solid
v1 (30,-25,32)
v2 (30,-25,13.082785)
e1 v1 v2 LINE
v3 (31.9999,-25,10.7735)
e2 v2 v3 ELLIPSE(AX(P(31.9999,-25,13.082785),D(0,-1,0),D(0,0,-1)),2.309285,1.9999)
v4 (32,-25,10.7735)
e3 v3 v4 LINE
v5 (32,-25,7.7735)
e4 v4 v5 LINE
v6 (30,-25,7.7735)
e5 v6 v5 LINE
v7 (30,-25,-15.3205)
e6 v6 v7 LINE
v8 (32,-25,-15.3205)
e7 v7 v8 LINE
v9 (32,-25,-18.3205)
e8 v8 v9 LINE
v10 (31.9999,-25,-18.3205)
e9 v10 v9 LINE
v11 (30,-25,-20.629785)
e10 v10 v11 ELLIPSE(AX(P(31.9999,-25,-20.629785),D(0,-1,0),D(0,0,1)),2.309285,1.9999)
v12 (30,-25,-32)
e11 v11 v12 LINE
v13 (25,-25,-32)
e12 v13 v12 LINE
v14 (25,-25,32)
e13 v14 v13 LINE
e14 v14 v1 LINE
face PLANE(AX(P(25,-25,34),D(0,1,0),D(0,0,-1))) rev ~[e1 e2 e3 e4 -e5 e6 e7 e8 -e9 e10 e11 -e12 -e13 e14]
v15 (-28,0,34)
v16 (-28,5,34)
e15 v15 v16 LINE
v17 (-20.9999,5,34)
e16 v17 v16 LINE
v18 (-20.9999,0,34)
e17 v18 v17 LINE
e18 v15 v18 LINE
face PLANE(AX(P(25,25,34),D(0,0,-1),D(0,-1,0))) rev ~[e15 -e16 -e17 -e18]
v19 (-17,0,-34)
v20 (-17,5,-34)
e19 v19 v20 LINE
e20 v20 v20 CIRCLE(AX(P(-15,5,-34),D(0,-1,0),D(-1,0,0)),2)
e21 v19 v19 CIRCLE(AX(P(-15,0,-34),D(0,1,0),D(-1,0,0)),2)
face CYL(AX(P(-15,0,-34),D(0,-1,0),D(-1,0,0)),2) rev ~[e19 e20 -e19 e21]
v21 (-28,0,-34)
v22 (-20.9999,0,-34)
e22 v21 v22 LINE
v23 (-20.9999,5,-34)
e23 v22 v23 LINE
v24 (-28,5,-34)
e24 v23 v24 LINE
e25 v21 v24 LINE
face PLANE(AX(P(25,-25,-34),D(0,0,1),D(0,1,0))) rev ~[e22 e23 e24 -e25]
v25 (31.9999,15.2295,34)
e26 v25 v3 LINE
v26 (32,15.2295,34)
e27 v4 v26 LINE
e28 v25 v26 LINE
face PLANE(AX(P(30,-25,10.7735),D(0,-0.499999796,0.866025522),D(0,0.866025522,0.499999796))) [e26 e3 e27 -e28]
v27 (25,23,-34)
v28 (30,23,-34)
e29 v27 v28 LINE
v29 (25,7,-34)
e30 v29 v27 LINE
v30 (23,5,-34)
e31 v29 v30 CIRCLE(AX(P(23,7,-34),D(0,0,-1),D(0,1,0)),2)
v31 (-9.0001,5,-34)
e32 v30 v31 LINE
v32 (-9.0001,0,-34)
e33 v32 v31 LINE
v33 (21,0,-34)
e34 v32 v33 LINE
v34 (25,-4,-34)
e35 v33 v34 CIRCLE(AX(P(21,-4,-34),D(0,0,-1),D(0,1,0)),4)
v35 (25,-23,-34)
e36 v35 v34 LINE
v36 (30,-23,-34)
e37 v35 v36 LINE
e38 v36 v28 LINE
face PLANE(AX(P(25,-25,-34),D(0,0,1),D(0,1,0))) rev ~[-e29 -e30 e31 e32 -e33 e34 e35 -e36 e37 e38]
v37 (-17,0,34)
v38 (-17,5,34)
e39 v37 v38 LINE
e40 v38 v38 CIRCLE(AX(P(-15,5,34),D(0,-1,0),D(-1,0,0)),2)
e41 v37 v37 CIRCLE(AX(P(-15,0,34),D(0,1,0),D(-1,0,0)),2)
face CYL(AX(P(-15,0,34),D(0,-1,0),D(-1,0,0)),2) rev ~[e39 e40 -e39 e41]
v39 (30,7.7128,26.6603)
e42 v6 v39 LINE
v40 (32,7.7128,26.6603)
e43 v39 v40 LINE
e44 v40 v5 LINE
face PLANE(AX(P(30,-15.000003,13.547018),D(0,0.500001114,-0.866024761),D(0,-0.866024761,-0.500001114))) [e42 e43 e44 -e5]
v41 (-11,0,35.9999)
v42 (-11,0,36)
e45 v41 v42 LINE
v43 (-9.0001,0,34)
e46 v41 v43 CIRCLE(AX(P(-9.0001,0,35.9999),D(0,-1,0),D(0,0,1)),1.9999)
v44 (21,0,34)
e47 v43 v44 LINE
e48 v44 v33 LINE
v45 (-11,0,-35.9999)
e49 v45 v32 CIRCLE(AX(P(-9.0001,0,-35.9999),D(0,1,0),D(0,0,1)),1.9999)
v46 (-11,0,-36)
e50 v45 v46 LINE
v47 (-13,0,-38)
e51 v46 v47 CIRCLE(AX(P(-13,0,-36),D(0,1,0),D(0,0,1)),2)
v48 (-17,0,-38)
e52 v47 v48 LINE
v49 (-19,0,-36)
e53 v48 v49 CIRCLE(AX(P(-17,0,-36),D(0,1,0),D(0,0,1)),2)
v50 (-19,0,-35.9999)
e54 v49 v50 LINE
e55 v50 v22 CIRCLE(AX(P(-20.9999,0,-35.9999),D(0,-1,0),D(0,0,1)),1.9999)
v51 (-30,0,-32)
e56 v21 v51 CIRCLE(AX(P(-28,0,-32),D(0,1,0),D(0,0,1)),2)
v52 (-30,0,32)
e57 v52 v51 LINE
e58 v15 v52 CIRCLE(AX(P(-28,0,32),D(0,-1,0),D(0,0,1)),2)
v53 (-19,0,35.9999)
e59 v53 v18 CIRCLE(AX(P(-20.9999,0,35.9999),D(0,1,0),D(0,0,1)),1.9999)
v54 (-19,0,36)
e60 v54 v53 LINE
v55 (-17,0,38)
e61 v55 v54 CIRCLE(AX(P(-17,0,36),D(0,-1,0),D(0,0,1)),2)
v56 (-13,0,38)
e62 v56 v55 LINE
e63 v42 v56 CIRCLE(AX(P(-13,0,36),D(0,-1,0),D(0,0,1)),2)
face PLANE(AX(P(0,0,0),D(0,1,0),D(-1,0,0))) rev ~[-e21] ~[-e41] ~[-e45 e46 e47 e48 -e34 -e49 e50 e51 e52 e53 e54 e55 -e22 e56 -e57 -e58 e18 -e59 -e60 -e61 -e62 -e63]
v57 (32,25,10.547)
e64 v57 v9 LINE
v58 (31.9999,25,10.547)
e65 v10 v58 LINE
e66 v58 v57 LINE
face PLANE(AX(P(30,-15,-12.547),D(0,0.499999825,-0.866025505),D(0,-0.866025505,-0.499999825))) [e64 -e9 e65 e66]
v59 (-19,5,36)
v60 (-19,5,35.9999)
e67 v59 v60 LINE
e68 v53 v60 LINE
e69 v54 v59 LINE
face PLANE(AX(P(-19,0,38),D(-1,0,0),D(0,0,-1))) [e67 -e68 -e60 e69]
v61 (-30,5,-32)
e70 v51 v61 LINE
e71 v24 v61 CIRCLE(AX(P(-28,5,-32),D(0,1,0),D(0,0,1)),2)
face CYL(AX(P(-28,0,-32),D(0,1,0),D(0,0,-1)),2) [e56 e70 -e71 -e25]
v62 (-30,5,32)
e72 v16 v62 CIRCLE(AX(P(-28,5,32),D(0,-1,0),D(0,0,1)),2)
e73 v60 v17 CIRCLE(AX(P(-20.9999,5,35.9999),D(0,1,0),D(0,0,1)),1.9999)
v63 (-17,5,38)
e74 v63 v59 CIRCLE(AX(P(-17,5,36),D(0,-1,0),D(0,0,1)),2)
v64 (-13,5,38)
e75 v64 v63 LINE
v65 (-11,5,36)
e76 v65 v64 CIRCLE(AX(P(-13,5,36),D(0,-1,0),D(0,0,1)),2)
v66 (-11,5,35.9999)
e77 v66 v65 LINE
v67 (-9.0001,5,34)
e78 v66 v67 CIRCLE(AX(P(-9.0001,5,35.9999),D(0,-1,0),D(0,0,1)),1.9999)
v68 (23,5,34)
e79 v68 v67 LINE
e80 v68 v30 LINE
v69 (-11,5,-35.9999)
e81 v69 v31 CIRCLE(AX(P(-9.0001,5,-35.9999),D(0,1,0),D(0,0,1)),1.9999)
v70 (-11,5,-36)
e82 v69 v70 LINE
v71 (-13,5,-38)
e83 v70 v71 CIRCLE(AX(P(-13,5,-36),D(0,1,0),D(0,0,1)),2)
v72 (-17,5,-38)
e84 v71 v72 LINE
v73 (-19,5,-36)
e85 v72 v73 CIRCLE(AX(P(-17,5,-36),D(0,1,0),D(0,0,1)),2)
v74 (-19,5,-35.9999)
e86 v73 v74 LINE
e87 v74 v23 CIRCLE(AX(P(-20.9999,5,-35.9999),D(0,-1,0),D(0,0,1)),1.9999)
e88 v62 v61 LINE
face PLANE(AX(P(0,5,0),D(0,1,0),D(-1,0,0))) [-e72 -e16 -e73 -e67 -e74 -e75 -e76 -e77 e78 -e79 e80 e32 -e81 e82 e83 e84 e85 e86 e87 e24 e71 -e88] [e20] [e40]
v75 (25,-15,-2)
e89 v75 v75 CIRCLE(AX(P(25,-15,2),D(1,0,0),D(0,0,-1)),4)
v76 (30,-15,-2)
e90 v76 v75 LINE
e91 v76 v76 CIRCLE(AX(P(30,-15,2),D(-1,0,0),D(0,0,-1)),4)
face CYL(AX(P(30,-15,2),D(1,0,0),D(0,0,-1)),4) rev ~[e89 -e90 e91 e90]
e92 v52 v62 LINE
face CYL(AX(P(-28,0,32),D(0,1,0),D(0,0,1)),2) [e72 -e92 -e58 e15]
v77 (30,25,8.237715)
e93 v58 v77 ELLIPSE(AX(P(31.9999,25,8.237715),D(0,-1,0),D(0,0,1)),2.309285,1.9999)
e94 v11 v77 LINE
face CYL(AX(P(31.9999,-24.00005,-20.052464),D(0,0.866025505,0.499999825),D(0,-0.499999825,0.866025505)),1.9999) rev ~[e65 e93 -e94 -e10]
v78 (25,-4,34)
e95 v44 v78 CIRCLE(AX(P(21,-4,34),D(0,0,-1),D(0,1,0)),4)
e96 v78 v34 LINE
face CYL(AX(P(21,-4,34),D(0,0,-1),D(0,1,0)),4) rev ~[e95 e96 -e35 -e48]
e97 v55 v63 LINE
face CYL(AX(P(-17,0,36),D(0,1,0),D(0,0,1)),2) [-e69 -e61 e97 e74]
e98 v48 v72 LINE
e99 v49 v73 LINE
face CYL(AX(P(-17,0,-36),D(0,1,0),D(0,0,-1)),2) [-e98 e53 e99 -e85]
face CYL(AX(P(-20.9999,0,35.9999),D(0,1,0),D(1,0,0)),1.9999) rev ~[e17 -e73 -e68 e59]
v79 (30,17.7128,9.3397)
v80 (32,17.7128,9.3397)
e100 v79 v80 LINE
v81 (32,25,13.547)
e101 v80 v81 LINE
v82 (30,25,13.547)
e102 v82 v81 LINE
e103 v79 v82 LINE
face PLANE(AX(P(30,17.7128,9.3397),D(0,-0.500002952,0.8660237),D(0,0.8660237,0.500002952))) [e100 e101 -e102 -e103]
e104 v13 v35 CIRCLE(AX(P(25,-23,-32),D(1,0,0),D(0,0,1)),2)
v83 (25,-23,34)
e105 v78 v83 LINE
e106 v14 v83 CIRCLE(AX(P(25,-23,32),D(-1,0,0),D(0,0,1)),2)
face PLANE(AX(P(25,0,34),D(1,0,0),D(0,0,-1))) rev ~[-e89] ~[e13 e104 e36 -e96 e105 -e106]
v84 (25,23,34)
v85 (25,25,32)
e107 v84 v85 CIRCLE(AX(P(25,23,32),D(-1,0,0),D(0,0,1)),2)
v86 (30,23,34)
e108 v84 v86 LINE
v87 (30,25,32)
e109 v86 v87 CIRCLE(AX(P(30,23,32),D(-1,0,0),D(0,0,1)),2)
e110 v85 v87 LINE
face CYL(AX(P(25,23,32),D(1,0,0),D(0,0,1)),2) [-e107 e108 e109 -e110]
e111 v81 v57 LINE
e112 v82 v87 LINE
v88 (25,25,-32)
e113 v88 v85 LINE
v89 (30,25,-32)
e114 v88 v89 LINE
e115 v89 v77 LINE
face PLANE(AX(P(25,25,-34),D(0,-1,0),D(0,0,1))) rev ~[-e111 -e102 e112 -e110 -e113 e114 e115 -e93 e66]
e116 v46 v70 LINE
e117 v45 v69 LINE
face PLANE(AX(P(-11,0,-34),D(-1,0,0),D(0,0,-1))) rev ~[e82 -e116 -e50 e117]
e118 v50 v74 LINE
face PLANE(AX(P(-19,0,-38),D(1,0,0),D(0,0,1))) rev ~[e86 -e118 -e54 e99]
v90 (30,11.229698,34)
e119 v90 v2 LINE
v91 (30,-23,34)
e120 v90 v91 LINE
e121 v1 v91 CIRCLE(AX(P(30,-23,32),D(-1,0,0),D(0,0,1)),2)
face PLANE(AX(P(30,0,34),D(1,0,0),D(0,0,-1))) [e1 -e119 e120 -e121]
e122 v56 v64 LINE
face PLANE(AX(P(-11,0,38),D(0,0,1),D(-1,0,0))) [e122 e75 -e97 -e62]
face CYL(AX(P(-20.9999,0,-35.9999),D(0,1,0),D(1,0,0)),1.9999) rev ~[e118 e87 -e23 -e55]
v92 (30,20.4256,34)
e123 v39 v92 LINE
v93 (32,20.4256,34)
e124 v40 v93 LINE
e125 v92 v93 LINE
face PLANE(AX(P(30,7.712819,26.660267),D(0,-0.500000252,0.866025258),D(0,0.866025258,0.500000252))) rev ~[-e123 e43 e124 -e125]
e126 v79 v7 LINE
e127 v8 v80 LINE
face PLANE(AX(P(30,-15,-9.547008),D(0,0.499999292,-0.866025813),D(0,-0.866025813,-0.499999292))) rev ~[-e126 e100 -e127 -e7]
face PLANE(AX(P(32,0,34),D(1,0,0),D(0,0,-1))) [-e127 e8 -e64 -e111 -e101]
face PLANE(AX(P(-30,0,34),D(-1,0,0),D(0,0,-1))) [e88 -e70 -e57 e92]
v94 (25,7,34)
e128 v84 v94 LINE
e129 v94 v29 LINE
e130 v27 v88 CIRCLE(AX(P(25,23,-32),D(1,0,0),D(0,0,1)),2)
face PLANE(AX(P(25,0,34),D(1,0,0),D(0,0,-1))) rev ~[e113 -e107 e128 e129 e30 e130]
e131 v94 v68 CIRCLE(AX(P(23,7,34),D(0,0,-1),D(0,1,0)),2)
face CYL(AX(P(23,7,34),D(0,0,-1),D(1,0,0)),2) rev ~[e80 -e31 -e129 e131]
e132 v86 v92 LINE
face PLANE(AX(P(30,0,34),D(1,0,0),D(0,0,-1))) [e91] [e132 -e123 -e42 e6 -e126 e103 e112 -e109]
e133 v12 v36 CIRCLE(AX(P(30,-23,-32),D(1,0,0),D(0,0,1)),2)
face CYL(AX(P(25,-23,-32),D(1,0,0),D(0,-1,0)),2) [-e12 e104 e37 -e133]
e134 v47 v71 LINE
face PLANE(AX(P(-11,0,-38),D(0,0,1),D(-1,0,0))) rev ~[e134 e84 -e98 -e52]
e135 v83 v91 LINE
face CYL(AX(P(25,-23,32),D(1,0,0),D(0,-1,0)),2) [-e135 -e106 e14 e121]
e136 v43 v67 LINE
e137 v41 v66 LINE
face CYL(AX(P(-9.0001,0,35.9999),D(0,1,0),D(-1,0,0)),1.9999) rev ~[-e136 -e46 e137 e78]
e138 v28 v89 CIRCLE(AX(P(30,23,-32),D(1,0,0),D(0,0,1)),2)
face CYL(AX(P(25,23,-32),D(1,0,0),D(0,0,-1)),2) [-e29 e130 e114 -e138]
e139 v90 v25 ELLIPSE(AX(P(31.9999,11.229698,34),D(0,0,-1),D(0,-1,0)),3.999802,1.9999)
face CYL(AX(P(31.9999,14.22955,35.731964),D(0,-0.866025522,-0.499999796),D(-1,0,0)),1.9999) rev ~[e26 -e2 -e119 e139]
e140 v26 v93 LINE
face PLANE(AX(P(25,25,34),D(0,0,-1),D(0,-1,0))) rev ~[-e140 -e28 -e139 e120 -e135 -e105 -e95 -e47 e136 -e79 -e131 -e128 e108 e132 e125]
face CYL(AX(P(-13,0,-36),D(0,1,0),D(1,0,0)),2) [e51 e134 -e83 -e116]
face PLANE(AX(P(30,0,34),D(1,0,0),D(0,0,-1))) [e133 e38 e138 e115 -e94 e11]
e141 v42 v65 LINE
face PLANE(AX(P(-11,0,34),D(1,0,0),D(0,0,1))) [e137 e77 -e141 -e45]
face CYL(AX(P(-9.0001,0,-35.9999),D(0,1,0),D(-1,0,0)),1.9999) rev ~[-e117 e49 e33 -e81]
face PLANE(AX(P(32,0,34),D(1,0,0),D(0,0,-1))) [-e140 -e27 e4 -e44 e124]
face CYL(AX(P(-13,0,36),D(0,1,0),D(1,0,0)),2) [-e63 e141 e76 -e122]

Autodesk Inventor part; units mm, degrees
ref_plane "YZ Plane" through (0, 0, 0) normal (1, 0, 0) x (0, 1, 0)
ref_plane "XZ Plane" through (0, 0, 0) normal (0, 1, 0) x (-1, 0, 0)
ref_plane "XY Plane" through (0, 0, 0) normal (0, 0, 1) x (1, 0, 0)
sketch "Sketch1" plane through (0, 0, 0) normal (0, 1, 0) x (-1, 0, 0)
  point P0 (0, 0)
sketch "Sketch2" plane through (0, 0, 0) normal (0, 1, 0) x (-1, 0, 0)
  line L0 (-10, 34) -> (10, 34)
  line L1 (10, 34) -> (10, -34)
  line L2 (10, -34) -> (-10, -34)
  line L3 (-10, -34) -> (-10, 34)
  line L4 (-10, 34) -> (10, -34) construction
  line L5 (10, 34) -> (-10, -34) construction
  line L6 (-10, 34) -> (-25, 34)
  line L7 (-25, 34) -> (-25, -34)
  line L8 (-25, -34) -> (-10, -34)
  line L9 (-10, -34) -> (-10, 34)
  line L10 (-10, 34) -> (30, 34)
  line L11 (30, 34) -> (30, -34)
  line L12 (30, -34) -> (-10, -34)
  line L13 (-10, -34) -> (-10, 34)
  line L14 (-10, -34) -> (-14, -34)
  line L15 (-14, -34) -> (-6, -34)
  line L16 (-6, -34) -> (-14, -34)
  line L17 (-10, 34) -> (-14, 34)
  line L18 (-14, 34) -> (-6, 34)
  line L19 (-14, 34) -> (-6, 34)
  line L20 (30, 34) -> (15, 34)
  line L21 (15, 34) -> (15, -34)
  line L22 (15, -34) -> (30, -34)
  line L23 (30, -34) -> (30, 34)
  circle A0 centre (15, -34) radius 2
  circle A1 centre (15, 34) radius 2
  line L24 (15, 34) -> (19, 34)
  line L25 (19, 34) -> (11, 34)
  line L26 (11, 34) -> (11, 38)
  line L27 (11, 38) -> (19, 38)
  line L28 (19, 38) -> (19, 34)
  line L29 (15, -34) -> (19, -34)
  line L30 (19, -34) -> (11, -34)
  line L31 (11, -34) -> (11, -38)
  line L32 (11, -38) -> (19, -38)
  line L33 (19, -38) -> (19, -34)
  point P0 (0, 0)
  point P1 (10, 34)
  point P2 (13, 34)
  point P3 (17, 34)
  point P4 (17, -34)
  point P5 (13, -34)
  point P6 (10, 34)
  dimension "d0" = 20
  dimension "d1" = 68
  dimension "d4" = 15
  dimension "d5" = 40
  dimension "d10" = 4
  dimension "d11" = 8
  dimension "d42" = 15
  dimension "d43" = 4
  dimension "d44" = 4
  dimension "d45" = 4
  dimension "d46" = 8
  dimension "d47" = 4
  dimension "d48" = 8
  dimension "d49" = 4
sketch "Sketch3" plane through (0, 0, 0) normal (0, 1, 0) x (-1, 0, 0)
  point P0 (0, 0)
extrude "Extrusion1" add sketch "Sketch2" along normal blind 5 contours L0 L1 L2 L3 | L3 L8 L7 L6 | L10 A1 L21 A0 L12 L1 | L10 L21 A1 | A0 L21 L12 | L10 A1 L21 | L10 L11 L12 A0 L21 A1 | L21 A0 L12
sketch "Sketch4" plane through (0, 0, 0) normal (0, -1, 0) x (1, 0, 0)
  point P0 (0, 0)
sketch "Sketch5" plane through (-30, 0, -34) normal (-1, 0, 0) x (0, 0, 1)
  point P0 (34, 0)
sketch "Sketch6" plane through (25, 0, 34) normal (1, 0, 0) x (0, 0, -1)
  line L0 (0, -25) -> (68, -25)
  line L1 (68, -25) -> (68, 25)
  line L2 (68, 25) -> (0, 25)
  line L3 (0, 25) -> (0, -25)
  line L4 (0, -25) -> (68, 25) construction
  line L5 (68, -25) -> (0, 25) construction
  point P0 (34, 0)
  dimension "d16" = 50
  dimension "d41" = 68
extrude "Extrusion2" add sketch "Sketch6" along normal blind 5
fillet "Face Fillet1" radius 2 1 edges at (25, 5, 0)
sketch "Sketch7" plane through (30, 0, 34) normal (1, 0, 0) x (0, 0, -1)
  line L0 (68, -25) -> (68, 0) projected
  line L1 (0, 25) -> (68, 25)
  line L2 (68, 25) -> (68, -15)
  line L3 (68, -15) -> (0, -15)
  line L4 (0, -15) -> (0, 25)
  line L5 (0, -15) -> (32, -15)
  circle A0 centre (32, -15) radius 4
  point P0 (34, 0)
  dimension "d20" = 40
  dimension "d21" = 32
  dimension "d22" = 8
extrude "Extrusion3" cut sketch "Sketch7" against normal through all contours A0 L3 | L3 A0
sketch "Sketch8" plane through (30, 0, 34) normal (1, 0, 0) x (0, 0, -1)
  line L0 (68, -25) -> (68, 0) projected
  line L1 (0, 25) -> (68, 25)
  line L2 (68, 25) -> (68, -15)
  line L3 (68, -15) -> (0, -15)
  line L4 (0, -15) -> (0, 25)
  line L5 (0, -15) -> (34, -15)
  circle A0 centre (32, -15) radius 4 projected
  line L6 (32, -15) -> (8.906, 25)
  line L7 (68, 25) -> (0, 25) projected
  line L8 (32, -15) -> (78.188, -15) construction
  line L9 (32, -15) -> (37.7735, -25)
  line L10 (0, -25) -> (68, -25) projected
  line L11 (16, 12.7128) -> (24.6603, 17.7128)
  line L12 (24.6603, 17.7128) -> (7.3397, 7.7128)
  line L13 (7.3397, 7.7128) -> (26.2265, -25)
  line L14 (26.2265, -25) -> (0, 20.4256)
  line L15 (0, 25) -> (0, -25) projected
  line L16 (24.6603, 17.7128) -> (49.3205, -25)
  line L17 (24.6603, 17.7128) -> (20.453, 25)
  line L18 (20.453, 25) -> (23.453, 25)
  line L19 (23.453, 25) -> (52.3205, -25)
  line L20 (26.2265, -25) -> (23.2265, -25)
  line L21 (23.2265, -25) -> (0, 15.2295)
  point P0 (34, 0)
  point P1 (0, 7)
  point P2 (0, 20.4256)
  point P3 (23.453, 25)
  point P4 (20.453, 25)
  dimension "d25" = 40
  dimension "d26" = 120
  dimension "d27" = 10
  dimension "d28" = 20
  dimension "d29" = 3
  dimension "d30" = 3
extrude "Extrusion4" add sketch "Sketch8" along normal blind 2 contours L10 L16 L3 L19 | L3 L16 L17 L1 L19 | L10 L21 L3 L13 | L3 L21 L4 L14 L13
fillet "Face Fillet2" radius 4 1 edges at (25, 0, 0)
fillet "Face Fillet3" radius 2 1 edges at (30, 0, -3.8868)
fillet "Face Fillet4" radius 2 1 edges at (30, -4.8853, 22.3868)
fillet "Fillet1" radius 2 6 edges at (-30, 2.5, -34) (-30, 2.5, 34) (27.5, -25, 34) (27.5, -25, -34) (27.5, 25, -34) (27.5, 25, 34)
extrude "Extrusion5" add sketch "Sketch2" along normal blind 5 contours L26 L27 L28 L10 A1
extrude "Extrusion6" add sketch "Sketch2" along normal blind 5 contours L12 A0 L33 L32 L31
extrude "Extrusion7" cut sketch "Sketch2" along normal blind 5 contours A0 L21 L12 | L21 A0 L12
extrude "Extrusion8" cut sketch "Sketch2" along normal blind 5 contours L10 L21 A1 | L10 A1 L21
fillet "Fillet2" radius 2 4 edges at (-19, 2.5, 38) (-11, 2.5, 38) (-19, 2.5, -38) (-11, 2.5, -38)
fillet "Face Fillet9" radius 2 1 edges at (-19, 2.5, 34)
fillet "Face Fillet10" radius 2 1 edges at (-11, 2.5, 34)
fillet "Face Fillet11" radius 2 1 edges at (-19, 2.5, -34)
fillet "Face Fillet12" radius 2 1 edges at (-11, 2.5, -34)
